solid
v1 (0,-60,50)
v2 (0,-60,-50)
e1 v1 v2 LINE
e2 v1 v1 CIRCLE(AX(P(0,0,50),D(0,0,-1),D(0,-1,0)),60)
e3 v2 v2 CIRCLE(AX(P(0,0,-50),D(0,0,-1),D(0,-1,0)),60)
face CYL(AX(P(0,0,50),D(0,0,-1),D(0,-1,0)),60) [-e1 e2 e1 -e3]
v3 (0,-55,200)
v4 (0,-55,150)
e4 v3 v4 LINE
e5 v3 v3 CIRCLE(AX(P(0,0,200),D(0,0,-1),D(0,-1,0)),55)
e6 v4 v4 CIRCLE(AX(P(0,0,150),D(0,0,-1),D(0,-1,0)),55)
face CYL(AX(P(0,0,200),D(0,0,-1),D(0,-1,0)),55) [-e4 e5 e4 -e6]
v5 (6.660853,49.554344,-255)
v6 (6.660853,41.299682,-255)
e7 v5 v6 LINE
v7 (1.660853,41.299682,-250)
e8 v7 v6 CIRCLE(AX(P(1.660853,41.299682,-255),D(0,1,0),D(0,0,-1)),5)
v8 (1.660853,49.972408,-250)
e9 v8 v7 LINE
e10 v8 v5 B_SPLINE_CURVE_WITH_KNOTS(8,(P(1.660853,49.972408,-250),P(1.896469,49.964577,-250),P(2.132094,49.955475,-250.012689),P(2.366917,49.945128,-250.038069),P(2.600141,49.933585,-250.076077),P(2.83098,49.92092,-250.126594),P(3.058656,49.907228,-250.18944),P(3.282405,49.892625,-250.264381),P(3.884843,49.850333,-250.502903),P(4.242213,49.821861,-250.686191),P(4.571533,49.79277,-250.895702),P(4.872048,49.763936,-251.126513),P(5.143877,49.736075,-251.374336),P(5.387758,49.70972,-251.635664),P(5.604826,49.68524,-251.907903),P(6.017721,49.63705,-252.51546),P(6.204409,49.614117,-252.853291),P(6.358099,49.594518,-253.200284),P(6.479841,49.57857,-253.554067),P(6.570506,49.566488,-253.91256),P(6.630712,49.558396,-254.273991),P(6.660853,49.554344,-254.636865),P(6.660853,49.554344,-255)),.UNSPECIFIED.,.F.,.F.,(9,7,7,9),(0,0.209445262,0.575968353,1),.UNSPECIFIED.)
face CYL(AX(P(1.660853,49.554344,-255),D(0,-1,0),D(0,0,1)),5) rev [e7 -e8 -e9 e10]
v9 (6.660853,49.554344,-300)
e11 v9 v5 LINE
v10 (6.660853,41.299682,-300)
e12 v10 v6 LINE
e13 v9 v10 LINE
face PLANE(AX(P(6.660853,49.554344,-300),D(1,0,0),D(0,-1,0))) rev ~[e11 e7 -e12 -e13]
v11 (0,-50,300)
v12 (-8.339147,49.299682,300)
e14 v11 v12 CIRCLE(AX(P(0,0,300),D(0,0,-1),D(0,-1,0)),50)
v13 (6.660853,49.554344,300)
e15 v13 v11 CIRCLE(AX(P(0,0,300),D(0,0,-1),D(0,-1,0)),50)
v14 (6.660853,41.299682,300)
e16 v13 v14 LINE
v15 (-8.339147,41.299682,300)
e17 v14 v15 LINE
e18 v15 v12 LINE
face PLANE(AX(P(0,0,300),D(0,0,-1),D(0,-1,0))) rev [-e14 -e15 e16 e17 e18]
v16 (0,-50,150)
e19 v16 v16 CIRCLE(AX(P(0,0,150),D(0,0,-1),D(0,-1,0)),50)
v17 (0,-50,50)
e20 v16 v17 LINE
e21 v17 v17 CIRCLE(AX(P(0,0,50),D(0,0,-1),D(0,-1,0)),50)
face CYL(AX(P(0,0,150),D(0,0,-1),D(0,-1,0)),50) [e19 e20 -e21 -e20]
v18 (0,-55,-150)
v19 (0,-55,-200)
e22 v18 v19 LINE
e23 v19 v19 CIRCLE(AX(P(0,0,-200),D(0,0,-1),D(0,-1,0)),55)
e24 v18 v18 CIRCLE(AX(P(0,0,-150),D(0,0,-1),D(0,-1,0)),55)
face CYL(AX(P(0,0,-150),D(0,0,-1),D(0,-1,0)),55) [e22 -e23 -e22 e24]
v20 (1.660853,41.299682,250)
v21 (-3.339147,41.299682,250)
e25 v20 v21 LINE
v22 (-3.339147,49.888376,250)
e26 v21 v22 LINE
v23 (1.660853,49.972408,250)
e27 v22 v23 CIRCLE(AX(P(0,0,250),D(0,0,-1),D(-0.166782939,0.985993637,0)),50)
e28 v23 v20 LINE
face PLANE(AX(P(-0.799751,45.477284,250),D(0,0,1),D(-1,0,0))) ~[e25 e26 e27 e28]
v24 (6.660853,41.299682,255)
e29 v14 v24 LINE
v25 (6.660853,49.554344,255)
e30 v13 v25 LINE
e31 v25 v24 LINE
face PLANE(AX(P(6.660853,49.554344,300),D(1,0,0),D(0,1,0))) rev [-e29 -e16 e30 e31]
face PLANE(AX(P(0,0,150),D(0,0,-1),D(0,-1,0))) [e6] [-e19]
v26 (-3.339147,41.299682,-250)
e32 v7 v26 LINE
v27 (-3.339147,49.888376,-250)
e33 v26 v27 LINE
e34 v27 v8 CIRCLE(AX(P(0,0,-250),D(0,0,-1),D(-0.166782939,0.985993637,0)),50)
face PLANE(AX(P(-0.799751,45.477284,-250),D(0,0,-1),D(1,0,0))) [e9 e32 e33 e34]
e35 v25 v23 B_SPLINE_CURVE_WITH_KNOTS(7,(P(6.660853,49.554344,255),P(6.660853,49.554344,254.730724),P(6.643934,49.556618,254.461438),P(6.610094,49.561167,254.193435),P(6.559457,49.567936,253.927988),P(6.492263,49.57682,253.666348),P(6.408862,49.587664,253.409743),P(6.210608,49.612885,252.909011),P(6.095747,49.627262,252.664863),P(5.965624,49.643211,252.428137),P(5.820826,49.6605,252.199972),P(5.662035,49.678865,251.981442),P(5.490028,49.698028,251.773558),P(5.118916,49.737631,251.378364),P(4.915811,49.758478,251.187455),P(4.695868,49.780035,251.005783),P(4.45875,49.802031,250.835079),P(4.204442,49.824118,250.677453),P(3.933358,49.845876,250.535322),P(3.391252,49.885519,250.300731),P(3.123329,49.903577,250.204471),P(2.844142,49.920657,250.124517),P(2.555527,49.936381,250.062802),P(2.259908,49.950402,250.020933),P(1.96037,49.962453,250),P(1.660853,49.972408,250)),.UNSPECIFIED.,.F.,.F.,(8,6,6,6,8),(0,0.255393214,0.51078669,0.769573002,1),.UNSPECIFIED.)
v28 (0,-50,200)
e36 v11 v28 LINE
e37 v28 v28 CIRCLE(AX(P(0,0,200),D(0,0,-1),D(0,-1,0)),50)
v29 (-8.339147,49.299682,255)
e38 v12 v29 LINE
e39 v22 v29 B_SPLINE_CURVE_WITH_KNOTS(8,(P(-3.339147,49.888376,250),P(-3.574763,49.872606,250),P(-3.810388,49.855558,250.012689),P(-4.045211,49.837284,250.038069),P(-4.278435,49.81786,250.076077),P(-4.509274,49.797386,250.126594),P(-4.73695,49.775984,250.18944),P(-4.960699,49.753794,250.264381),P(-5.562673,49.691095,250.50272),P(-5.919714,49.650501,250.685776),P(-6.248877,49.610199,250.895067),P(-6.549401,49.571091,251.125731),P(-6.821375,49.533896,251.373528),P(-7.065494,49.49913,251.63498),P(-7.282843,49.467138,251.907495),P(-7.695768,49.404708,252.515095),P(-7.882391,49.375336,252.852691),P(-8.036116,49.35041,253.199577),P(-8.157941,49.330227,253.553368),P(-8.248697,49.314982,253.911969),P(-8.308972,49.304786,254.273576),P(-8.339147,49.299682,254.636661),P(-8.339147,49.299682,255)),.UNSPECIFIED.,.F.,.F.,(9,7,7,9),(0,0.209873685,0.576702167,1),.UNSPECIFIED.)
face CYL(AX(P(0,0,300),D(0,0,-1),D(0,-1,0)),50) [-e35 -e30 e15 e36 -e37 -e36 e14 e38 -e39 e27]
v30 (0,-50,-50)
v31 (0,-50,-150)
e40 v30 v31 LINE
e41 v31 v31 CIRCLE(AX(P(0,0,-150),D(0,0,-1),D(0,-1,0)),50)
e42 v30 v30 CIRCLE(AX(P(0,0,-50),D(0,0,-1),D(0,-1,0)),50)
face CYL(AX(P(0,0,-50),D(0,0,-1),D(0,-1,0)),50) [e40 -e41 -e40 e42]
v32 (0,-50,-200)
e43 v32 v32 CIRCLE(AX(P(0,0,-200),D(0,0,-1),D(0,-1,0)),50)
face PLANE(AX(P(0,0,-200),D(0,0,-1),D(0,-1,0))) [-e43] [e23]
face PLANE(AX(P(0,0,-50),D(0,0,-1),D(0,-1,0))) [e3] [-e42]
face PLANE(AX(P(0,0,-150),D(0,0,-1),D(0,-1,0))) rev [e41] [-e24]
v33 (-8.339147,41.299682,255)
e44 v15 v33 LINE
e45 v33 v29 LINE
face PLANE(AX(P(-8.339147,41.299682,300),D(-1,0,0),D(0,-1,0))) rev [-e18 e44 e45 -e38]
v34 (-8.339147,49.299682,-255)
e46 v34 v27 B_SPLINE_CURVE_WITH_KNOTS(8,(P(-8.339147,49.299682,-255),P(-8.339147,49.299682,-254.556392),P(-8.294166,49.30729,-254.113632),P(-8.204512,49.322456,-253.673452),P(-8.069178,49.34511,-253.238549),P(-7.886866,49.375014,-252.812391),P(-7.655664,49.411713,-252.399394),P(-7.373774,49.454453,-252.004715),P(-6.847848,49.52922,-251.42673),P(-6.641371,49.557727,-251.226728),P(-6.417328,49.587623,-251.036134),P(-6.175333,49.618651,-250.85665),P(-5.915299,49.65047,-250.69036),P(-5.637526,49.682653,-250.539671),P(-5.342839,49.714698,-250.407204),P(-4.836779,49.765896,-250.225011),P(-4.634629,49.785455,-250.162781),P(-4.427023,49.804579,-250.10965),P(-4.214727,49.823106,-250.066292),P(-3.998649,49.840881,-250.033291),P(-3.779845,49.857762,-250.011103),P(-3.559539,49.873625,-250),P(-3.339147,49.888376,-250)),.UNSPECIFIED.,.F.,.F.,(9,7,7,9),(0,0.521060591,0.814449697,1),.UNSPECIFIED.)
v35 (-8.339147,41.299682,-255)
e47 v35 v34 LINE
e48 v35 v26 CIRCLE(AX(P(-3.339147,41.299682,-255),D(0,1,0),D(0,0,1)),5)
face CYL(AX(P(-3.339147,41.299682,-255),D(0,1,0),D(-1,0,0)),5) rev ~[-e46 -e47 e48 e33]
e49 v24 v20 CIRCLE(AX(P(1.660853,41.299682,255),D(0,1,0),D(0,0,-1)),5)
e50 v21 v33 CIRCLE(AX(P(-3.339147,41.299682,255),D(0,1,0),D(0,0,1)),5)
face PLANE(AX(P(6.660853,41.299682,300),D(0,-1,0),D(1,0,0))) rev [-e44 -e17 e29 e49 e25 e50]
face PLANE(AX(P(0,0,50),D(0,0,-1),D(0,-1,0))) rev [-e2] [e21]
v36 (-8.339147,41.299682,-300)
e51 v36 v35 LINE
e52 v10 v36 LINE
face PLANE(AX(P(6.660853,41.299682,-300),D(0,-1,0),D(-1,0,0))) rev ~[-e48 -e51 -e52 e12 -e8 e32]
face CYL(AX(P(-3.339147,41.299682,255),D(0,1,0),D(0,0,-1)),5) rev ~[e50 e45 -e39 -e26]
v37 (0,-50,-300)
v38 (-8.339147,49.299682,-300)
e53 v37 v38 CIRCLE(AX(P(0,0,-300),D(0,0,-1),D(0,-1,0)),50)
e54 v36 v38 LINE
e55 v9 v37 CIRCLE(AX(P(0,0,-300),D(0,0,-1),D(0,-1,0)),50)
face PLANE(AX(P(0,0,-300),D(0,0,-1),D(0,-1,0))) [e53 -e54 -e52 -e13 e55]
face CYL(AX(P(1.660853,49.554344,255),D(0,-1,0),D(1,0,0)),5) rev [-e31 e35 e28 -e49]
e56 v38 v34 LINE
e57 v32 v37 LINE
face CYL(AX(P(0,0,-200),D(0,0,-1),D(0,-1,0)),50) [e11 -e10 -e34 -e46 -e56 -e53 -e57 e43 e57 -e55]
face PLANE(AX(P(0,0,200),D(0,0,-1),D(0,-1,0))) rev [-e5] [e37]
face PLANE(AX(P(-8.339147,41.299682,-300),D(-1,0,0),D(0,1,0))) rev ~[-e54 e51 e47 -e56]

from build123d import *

# Parameters (mm, degrees)
F3_DEPTH = 50
F4_R     = 5


# Not quite as in the source:
# - a pattern or mirror of a feature is missing from the dataset's text; its kind, count and spacing are read off the source's solid


with BuildPart() as f1:
    # F0 (on Right) → F1 (revolve)
    with BuildSketch(Plane.YZ):
        Polygon((-55, -150), (-55, -200), (-50, -200), (-50, -300), (0, -300), (0, 300), (-50, 300), (-50, 200), (-55, 200), (-55, 150), (-50, 150), (-50, 50), (-60, 50), (-60, -50), (-50, -50), (-50, -150), align=None)
    revolve(axis=Axis((0, 0, 0), (0, 0, -1)))

    # F2 (on face) → F3 (cut)
    with BuildSketch(Plane(origin=(0, 0, -300), x_dir=(1, 0, 0), z_dir=(0, 0, -1))):
        with BuildLine():
            Line((-8.3391469531, -41.2996818255), (-8.3391469531, -49.2996818255))
            ThreePointArc((-8.3391469531, -49.2996818255), (-0.8487525257, -49.9927956725), (6.6608530469, -49.5543442766))
            Line((6.6608530469, -49.5543442766), (6.6608530469, -41.2996818255))
            Line((6.6608530469, -41.2996818255), (-8.3391469531, -41.2996818255))
        make_face()
    f3 = extrude(amount=-F3_DEPTH, mode=Mode.SUBTRACT)

    # F3_copies: F3 across plane
    add(f3.mirror(Plane.XY), mode=Mode.SUBTRACT)

    # F4
    f4_edges = [f1.edges().sort_by_distance(p)[0] for p in [
        (6.660853, 45.427013, -250),
        (-8.339147, 45.299682, -250),
        (6.660853, 45.427013, 250),
        (-8.339147, 45.299682, 250),
    ]]
    fillet(f4_edges, radius=F4_R)


solid = f1.part
